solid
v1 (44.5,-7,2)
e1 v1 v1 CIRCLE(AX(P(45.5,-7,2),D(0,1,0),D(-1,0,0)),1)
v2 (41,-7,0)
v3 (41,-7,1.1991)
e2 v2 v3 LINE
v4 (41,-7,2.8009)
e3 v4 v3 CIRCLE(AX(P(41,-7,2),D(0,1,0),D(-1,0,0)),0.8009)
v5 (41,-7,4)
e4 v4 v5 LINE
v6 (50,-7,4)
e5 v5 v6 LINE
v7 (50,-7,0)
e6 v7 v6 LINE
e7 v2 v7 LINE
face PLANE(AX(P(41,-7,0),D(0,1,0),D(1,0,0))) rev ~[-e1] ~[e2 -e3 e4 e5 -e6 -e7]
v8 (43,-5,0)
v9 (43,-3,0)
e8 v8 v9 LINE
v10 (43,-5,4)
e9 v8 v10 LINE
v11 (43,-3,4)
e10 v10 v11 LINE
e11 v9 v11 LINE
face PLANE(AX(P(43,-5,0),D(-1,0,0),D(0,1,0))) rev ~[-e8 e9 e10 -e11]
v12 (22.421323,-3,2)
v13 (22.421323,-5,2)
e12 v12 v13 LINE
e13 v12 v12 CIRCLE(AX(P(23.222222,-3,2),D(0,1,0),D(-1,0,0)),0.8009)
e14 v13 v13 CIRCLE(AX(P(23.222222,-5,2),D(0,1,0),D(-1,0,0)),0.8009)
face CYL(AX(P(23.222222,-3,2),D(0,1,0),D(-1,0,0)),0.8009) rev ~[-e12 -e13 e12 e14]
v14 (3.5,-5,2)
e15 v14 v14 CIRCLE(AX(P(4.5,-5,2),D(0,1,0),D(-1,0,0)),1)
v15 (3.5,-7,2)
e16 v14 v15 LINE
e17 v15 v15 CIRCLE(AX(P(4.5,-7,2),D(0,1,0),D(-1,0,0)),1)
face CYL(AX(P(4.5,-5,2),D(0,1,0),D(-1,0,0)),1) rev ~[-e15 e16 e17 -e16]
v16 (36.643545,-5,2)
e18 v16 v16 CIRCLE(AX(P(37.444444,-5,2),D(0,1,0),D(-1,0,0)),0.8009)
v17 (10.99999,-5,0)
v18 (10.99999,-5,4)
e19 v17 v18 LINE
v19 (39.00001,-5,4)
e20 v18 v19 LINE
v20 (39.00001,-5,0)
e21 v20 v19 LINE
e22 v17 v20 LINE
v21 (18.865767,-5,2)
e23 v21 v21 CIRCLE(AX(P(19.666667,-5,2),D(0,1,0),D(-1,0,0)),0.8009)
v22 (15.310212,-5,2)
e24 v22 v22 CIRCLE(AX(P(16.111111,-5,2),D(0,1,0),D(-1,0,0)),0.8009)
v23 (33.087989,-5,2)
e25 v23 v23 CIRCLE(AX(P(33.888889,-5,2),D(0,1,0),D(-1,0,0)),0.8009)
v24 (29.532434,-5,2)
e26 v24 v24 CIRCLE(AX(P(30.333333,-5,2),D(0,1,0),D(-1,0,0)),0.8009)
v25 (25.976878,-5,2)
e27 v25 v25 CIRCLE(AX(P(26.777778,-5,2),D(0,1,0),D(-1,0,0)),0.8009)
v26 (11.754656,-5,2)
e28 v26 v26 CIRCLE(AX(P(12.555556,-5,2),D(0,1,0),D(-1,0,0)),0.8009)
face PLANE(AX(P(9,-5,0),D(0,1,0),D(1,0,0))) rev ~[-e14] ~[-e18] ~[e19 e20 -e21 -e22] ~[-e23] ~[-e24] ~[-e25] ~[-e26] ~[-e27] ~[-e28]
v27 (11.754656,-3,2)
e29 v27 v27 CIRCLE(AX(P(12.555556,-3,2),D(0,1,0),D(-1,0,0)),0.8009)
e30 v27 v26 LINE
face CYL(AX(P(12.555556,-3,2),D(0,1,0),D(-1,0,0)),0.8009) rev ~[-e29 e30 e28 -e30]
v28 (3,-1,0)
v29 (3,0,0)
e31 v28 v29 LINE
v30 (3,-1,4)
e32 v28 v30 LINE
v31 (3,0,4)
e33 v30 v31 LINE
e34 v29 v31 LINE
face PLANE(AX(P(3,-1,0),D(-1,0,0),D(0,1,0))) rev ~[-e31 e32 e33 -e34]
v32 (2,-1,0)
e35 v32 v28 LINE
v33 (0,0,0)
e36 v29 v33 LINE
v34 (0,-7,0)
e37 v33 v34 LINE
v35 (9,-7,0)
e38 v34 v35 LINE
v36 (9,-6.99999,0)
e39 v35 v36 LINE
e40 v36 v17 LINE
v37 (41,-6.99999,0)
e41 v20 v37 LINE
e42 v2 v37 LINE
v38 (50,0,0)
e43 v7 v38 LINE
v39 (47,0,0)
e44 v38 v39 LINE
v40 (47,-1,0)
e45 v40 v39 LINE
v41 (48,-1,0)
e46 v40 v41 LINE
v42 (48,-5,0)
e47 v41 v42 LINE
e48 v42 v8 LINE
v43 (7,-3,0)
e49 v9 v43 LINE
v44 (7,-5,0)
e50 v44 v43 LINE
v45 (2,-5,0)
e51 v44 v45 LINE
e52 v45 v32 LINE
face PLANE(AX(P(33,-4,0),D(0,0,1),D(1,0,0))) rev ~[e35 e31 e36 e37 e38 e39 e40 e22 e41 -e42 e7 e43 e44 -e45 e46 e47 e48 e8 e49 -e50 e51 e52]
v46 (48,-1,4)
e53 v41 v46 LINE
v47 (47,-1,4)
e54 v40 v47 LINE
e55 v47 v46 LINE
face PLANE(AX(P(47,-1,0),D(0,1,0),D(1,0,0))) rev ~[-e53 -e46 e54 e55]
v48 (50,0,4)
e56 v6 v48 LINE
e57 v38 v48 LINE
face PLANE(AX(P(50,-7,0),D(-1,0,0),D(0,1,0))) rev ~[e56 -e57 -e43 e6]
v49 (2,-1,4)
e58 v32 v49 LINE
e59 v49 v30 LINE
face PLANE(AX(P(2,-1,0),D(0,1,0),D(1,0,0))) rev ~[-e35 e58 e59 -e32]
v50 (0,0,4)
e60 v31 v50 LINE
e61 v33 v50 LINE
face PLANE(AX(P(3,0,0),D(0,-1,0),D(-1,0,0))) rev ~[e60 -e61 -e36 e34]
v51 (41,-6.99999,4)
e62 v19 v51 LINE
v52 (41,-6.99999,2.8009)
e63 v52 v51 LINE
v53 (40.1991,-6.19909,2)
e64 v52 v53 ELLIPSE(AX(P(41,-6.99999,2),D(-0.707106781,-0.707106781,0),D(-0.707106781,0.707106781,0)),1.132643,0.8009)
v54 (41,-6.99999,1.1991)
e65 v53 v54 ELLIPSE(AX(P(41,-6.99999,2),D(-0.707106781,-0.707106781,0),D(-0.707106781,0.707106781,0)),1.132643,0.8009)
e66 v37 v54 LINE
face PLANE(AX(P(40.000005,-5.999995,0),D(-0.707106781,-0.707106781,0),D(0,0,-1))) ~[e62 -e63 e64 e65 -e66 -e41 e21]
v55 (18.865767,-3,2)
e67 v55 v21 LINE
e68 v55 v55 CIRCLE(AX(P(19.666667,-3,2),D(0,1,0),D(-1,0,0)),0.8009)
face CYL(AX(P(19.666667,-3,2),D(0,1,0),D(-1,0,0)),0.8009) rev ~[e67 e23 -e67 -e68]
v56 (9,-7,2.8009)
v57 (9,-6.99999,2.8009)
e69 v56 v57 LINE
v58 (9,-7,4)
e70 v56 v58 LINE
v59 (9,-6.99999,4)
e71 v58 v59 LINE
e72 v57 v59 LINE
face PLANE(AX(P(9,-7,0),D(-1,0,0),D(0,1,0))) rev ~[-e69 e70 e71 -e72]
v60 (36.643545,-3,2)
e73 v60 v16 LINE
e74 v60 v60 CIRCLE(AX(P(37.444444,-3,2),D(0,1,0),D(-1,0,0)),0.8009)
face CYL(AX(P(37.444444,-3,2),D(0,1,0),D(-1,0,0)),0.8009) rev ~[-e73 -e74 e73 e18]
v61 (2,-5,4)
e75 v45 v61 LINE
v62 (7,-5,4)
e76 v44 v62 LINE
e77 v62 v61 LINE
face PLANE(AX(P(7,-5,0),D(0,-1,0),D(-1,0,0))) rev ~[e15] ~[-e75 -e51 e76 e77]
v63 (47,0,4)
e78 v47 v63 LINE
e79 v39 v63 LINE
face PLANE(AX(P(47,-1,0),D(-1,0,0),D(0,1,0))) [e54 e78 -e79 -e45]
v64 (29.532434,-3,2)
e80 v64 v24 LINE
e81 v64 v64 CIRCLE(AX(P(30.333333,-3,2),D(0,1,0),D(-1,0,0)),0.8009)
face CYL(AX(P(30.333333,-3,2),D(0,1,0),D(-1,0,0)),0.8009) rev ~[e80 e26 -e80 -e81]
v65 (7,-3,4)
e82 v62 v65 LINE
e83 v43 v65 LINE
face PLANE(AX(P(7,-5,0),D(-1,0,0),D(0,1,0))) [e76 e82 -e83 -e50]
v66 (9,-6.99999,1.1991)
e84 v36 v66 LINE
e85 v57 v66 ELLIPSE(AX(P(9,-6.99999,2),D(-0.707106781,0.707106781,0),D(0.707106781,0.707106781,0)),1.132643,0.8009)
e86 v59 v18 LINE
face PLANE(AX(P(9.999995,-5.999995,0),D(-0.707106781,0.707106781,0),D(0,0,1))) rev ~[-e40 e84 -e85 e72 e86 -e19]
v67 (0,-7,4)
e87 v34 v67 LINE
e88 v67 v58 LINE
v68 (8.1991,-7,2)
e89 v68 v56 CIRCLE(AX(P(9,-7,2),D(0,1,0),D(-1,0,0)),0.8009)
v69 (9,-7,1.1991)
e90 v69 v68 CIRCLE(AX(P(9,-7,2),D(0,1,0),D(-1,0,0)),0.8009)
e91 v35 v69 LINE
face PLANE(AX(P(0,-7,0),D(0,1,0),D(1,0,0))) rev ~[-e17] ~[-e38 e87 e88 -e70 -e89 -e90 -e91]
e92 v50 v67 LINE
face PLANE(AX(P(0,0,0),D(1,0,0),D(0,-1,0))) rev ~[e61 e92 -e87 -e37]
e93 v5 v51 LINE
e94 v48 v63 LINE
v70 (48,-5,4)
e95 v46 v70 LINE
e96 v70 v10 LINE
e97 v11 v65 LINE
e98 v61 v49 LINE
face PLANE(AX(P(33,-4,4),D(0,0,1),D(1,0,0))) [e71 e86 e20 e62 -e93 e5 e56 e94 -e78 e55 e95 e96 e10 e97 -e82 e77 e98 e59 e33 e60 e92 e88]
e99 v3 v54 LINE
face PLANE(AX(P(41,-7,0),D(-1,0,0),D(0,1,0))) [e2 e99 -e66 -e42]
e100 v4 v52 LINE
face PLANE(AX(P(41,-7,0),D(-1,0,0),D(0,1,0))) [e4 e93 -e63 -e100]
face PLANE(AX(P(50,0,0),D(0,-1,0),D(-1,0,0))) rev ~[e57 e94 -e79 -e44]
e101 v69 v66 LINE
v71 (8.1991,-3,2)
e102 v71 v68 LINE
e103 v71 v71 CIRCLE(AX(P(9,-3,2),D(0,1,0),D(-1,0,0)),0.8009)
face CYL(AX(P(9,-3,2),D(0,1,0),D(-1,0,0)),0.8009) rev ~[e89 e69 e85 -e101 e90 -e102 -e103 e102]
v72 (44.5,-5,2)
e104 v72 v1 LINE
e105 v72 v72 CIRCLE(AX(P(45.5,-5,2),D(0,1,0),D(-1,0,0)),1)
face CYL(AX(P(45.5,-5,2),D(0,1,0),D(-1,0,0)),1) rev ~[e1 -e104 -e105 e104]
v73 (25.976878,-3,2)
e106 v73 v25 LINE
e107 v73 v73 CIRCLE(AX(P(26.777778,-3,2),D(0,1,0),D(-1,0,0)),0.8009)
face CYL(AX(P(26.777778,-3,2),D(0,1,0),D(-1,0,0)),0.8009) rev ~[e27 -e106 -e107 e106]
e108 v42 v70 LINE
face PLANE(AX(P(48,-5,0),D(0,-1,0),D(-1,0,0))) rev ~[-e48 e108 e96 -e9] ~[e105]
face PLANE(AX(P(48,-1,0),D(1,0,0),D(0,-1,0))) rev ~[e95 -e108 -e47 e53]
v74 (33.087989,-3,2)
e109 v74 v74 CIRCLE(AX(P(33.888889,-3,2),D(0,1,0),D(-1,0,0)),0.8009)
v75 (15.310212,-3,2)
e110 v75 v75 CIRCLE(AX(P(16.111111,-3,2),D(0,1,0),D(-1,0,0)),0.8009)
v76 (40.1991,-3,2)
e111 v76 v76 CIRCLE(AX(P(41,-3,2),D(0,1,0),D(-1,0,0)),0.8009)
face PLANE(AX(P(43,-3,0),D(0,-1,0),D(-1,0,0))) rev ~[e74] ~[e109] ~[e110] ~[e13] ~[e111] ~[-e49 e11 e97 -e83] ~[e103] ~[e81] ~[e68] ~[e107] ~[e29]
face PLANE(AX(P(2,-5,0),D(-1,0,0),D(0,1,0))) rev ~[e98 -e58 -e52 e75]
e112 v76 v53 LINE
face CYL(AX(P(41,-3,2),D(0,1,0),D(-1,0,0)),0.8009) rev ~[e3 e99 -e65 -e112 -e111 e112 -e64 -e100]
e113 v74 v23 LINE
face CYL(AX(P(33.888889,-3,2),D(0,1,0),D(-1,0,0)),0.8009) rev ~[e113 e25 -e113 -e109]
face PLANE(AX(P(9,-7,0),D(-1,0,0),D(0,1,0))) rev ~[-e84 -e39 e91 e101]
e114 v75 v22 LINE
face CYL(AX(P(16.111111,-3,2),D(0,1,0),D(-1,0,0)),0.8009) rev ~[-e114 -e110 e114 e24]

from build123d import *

# Parameters (mm, degrees)
F0_W     = 16
F0_H     = 2
F0_W_2   = 2
F0_W_3   = 1
F0_H_2   = 1
F1_DEPTH = 4
F2_SIZE  = 1.99999
F3_R     = 1
F4_DEPTH = 2
F5_R     = 0.8008995453
F6_DEPTH = 5


# Not quite as in the source:
# - a fillet or chamfer is up to 0.001 mm smaller than in the source, because OpenCascade refuses the exact size


with BuildPart() as f1:
    # F0 (on Top) → F1 (new body)
    with BuildSketch(Plane.XY):
        with Locations((33, -4)):
            Rectangle(F0_W, F0_H)
        with Locations((17, -4)):
            Rectangle(F0_W, F0_H)
        Polygon((48, -5), (43, -5), (43, -7), (50, -7), (50, -5), align=None)
        with Locations((42, -6)):
            Rectangle(F0_W_2, F0_H)
        Polygon((2, -5), (0, -5), (0, -7), (7, -7), (7, -5), align=None)
        Polygon((2, 0), (0, 0), (0, -5), (2, -5), (2, -1), align=None)
        with Locations((47.5, -0.5)):
            Rectangle(F0_W_3, F0_H_2)
        with Locations((8, -4)):
            Rectangle(F0_W_2, F0_H)
        with Locations((8, -6)):
            Rectangle(F0_W_2, F0_H)
        with Locations((2.5, -0.5)):
            Rectangle(F0_W_3, F0_H_2)
        with Locations((42, -4)):
            Rectangle(F0_W_2, F0_H)
        Polygon((48, -1), (48, -5), (50, -5), (50, 0), (48, 0), align=None)
    extrude(amount=F1_DEPTH)

    # F2 (size 2 in the source; OpenCascade refuses exactly that, so slightly less here)
    f2_edges = [f1.edges().sort_by_distance(p)[0] for p in [
        (41, -5, 2),
        (9, -5, 2),
    ]]
    chamfer(f2_edges, length=F2_SIZE)

    # F3 (on face) → F4 (cut)
    with BuildSketch(Plane(origin=(0, -5, 0), x_dir=(-1, 0, 0), z_dir=(0, 1, 0))):
        with Locations((-4.5, 2)):
            Circle(F3_R)
        with Locations((-45.5, 2)):
            Circle(F3_R)
    extrude(amount=-F4_DEPTH, mode=Mode.SUBTRACT)

    # F5 (on face) → F6 (cut)
    with BuildSketch(Plane(origin=(0, -3, 0), x_dir=(-1, 0, 0), z_dir=(0, 1, 0))):
        with Locations((-16.1111111111, 2)):
            Circle(F5_R)
        with Locations((-9, 2)):
            Circle(F5_R)
        with Locations((-12.5555555556, 2)):
            Circle(F5_R)
        with Locations((-19.6666666667, 2)):
            Circle(F5_R)
        with Locations((-23.2222222222, 2)):
            Circle(F5_R)
        with Locations((-26.7777777778, 2)):
            Circle(F5_R)
        with Locations((-30.3333333333, 2)):
            Circle(F5_R)
        with Locations((-33.8888888889, 2)):
            Circle(F5_R)
        with Locations((-37.4444444444, 2)):
            Circle(F5_R)
        with Locations((-41, 2)):
            Circle(F5_R)
    extrude(amount=-F6_DEPTH, mode=Mode.SUBTRACT)


solid = f1.part
